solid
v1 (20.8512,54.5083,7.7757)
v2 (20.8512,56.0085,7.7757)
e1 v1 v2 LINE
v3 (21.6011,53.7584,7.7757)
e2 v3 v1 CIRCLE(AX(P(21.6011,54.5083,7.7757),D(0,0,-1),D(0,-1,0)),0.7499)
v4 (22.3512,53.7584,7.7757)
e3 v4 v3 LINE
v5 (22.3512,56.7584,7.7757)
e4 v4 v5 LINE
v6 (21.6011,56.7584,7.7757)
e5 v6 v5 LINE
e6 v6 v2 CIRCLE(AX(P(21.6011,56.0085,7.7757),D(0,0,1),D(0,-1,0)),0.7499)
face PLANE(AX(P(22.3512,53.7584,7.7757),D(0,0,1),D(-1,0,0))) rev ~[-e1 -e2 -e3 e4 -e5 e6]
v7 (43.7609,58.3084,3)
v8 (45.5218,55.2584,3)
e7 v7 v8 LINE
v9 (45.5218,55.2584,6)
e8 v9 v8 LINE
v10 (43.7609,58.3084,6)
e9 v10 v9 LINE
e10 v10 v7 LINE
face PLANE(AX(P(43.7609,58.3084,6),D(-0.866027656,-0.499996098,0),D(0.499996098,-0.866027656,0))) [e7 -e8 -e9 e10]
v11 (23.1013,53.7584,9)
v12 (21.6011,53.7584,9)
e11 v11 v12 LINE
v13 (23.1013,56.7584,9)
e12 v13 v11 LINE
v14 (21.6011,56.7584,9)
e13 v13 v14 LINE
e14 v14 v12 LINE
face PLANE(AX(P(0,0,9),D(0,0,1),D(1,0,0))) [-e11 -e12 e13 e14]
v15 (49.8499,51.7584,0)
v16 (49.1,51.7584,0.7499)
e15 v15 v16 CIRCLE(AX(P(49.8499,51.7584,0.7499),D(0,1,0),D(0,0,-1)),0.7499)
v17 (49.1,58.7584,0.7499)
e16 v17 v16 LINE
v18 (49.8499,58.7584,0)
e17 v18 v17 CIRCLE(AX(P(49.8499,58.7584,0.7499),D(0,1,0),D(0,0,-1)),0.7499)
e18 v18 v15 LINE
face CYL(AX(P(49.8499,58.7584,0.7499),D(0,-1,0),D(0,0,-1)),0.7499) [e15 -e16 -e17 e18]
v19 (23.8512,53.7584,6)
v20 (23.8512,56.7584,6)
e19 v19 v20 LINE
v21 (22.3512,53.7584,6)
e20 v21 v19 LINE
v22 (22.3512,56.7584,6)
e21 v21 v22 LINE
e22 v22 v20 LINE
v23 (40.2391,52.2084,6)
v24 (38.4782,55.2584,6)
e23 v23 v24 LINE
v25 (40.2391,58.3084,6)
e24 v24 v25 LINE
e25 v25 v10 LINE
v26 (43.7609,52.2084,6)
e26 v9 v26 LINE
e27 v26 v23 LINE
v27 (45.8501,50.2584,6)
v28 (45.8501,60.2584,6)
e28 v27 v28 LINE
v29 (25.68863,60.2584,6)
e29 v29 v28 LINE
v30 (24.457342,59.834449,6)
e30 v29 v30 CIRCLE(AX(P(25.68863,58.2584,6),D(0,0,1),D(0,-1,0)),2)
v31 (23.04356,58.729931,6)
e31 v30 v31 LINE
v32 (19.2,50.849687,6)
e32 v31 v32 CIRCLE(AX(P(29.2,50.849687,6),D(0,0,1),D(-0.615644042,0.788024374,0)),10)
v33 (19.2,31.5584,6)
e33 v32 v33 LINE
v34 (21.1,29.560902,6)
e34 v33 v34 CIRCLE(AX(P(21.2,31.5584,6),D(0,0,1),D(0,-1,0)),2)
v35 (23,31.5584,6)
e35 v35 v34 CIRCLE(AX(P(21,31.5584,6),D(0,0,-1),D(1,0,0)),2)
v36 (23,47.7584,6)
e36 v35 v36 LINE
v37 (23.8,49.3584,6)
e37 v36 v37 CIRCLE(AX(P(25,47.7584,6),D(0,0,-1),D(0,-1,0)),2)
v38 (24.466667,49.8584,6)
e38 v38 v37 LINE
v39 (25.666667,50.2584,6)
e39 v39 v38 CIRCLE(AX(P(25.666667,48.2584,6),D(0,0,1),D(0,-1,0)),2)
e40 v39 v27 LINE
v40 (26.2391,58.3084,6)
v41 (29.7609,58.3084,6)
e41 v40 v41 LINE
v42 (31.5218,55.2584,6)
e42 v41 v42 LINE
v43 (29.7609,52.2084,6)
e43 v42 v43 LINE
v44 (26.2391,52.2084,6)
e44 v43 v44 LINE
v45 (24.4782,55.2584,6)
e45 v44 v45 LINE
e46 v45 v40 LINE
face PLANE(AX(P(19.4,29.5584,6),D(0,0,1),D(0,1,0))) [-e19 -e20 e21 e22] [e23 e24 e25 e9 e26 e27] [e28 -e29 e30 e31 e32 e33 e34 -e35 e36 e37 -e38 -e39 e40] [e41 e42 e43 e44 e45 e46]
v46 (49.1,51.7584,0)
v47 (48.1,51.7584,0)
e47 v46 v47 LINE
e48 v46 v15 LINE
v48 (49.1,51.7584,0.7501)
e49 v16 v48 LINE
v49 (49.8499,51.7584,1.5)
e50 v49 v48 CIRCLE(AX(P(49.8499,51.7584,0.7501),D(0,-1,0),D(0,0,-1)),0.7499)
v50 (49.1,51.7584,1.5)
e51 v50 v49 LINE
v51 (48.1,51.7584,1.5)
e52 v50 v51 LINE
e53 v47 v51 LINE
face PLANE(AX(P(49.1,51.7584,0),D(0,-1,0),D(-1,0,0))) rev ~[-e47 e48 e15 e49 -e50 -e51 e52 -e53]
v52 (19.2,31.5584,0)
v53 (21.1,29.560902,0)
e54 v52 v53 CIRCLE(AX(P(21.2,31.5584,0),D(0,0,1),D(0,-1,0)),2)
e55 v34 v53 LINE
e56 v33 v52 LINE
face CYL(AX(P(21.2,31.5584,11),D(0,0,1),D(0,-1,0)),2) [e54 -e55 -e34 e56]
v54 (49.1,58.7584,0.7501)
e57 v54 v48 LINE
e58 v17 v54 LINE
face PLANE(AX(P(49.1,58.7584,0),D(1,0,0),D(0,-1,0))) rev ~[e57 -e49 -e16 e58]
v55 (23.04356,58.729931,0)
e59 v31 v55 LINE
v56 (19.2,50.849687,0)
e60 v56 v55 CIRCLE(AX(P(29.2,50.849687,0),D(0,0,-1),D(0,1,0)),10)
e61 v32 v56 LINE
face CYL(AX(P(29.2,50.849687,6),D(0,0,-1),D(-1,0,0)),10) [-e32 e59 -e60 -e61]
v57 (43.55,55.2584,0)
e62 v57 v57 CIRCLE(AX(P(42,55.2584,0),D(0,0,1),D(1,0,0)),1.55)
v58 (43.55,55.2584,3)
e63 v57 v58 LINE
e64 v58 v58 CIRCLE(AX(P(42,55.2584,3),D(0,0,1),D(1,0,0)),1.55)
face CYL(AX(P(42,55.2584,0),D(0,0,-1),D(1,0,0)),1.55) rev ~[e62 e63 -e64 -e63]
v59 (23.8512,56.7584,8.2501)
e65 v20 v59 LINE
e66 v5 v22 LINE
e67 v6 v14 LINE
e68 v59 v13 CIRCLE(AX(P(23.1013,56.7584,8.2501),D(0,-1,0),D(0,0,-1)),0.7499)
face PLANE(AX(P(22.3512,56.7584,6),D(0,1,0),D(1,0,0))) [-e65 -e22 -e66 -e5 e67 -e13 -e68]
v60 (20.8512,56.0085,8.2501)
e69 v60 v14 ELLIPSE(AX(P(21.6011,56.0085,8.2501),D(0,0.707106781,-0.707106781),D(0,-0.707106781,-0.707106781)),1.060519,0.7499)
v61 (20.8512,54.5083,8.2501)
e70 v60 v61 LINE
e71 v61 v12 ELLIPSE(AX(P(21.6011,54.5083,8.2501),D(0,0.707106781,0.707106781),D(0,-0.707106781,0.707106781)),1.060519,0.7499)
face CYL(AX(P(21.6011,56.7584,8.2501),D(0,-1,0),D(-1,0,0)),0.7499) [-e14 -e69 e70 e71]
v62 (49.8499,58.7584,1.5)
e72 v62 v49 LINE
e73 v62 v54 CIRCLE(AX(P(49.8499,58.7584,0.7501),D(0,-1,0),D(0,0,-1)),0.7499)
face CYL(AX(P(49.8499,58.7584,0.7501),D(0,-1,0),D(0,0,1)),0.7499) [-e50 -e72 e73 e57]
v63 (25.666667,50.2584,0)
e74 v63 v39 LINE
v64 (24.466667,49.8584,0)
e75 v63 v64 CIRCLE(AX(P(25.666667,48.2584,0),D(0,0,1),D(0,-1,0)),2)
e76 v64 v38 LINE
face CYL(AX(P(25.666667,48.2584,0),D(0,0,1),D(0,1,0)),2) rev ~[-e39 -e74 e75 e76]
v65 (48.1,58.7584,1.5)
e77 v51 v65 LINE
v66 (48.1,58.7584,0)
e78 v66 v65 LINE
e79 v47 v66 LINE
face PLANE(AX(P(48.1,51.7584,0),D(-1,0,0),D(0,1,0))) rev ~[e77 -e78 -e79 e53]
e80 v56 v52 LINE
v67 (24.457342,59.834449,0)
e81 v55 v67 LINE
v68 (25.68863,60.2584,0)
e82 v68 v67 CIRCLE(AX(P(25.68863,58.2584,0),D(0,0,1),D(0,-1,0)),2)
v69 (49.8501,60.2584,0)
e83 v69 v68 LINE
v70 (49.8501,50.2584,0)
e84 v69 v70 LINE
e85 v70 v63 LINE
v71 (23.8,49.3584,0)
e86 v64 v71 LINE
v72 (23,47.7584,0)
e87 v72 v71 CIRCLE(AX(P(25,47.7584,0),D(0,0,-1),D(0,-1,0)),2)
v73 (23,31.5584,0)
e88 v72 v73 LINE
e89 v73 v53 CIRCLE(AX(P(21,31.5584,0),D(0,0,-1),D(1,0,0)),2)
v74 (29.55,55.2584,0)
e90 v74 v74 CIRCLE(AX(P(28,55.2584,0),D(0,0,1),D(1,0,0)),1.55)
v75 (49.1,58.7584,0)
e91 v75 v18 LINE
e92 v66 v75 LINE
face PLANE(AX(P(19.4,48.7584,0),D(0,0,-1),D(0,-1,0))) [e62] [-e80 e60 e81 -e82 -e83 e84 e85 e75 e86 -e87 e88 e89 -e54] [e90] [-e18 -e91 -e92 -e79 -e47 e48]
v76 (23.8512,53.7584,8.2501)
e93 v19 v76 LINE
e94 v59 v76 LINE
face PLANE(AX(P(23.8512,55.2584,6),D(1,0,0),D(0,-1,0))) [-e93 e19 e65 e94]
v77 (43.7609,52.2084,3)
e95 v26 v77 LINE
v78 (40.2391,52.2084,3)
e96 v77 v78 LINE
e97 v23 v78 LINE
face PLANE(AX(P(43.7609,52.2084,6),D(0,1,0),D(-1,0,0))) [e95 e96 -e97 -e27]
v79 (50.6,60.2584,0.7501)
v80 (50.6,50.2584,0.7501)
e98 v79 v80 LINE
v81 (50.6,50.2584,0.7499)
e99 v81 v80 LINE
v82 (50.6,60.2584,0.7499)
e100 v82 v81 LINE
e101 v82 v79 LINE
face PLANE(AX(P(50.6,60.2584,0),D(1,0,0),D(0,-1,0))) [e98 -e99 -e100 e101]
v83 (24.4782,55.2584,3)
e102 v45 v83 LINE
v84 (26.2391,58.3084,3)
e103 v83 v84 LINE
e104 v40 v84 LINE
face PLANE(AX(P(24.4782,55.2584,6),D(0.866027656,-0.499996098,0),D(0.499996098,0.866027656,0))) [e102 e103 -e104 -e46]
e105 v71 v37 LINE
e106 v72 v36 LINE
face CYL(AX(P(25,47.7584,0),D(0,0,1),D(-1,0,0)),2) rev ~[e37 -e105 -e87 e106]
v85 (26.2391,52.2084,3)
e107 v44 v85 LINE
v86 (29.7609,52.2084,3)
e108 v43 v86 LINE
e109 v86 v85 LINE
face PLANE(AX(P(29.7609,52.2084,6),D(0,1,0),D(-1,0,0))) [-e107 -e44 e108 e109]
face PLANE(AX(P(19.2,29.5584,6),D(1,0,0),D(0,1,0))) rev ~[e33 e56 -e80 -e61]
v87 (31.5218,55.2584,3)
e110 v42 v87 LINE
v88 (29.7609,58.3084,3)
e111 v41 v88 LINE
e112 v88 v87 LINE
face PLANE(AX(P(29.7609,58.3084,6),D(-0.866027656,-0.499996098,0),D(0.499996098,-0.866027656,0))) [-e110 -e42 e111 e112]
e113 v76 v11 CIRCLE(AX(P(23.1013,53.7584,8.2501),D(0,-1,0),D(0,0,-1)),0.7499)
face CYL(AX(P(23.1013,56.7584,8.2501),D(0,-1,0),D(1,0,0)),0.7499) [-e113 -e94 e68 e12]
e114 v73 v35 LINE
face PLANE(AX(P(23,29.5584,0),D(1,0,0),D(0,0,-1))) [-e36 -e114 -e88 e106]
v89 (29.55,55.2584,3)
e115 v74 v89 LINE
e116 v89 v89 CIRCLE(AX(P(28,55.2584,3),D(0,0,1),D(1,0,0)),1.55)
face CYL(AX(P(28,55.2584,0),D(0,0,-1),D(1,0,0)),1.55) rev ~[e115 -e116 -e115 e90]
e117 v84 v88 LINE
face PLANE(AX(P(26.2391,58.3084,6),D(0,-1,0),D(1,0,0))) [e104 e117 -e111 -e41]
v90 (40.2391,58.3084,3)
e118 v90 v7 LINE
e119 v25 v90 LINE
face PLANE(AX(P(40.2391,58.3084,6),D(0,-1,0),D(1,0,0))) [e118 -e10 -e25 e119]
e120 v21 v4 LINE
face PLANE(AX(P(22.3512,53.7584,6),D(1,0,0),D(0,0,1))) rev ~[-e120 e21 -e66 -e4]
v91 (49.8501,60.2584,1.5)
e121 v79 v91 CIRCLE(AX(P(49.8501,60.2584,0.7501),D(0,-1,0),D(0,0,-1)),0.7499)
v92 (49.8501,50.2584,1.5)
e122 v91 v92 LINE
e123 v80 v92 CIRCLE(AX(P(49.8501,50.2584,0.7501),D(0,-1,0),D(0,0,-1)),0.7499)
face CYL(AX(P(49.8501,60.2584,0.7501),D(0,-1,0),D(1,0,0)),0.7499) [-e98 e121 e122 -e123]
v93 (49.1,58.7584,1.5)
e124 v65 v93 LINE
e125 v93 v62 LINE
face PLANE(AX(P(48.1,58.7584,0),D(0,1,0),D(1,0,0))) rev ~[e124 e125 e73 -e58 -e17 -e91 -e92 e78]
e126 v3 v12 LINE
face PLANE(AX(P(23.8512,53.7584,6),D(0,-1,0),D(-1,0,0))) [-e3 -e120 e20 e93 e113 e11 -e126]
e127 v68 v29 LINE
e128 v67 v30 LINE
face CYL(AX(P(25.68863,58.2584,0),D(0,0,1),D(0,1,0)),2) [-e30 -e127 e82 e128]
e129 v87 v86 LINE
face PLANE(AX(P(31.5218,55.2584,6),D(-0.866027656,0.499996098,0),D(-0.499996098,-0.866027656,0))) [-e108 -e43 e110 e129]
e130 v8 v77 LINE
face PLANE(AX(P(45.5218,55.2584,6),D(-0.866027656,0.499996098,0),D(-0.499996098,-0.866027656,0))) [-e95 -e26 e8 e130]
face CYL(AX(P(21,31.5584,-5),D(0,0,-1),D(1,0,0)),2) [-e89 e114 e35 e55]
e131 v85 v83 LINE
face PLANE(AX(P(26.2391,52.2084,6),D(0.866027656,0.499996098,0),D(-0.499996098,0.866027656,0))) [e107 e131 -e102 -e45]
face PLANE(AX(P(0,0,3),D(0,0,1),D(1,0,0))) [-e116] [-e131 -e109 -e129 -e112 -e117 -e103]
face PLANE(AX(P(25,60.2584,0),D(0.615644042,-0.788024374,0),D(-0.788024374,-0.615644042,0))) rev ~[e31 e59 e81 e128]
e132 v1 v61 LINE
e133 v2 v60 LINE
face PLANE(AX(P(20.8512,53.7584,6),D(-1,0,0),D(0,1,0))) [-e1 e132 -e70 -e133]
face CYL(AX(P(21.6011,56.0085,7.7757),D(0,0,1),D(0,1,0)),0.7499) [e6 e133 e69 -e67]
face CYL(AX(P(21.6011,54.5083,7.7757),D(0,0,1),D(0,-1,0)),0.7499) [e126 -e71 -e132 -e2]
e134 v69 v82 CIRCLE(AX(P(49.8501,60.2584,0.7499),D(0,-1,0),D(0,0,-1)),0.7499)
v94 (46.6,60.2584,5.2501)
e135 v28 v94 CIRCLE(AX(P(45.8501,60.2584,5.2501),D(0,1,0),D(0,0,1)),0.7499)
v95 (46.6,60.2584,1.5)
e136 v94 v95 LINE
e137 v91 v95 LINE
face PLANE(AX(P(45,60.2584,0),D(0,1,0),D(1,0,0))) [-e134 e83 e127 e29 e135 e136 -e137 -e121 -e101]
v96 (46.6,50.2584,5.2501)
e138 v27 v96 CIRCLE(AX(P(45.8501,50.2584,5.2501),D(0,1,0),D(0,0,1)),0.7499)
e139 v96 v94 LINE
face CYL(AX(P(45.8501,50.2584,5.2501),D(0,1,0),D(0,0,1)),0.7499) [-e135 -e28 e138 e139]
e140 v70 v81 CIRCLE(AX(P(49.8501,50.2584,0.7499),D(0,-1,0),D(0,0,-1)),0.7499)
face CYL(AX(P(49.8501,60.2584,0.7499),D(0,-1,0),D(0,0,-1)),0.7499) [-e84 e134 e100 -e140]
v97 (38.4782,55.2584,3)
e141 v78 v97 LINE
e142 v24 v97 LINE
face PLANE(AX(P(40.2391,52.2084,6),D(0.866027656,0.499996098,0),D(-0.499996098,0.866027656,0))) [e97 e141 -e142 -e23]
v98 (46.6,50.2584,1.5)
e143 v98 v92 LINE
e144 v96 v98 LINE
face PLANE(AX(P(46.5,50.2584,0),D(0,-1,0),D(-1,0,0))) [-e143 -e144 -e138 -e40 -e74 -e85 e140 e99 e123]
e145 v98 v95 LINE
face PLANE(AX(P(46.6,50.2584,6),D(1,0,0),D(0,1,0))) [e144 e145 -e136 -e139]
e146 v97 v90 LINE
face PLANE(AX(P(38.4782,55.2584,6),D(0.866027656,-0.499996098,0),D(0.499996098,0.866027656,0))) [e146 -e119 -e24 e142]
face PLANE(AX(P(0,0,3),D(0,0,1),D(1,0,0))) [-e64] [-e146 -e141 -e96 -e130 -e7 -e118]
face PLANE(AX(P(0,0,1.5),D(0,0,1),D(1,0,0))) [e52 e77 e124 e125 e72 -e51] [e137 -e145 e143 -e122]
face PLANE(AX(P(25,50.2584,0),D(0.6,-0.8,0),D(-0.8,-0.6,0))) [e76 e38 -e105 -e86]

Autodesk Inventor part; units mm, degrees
ref_plane "YZ Plane" through (0, 0, 0) normal (1, 0, 0) x (0, 1, 0)
ref_plane "XZ Plane" through (0, 0, 0) normal (0, 1, 0) x (-1, 0, 0)
ref_plane "Work Plane1" through (0, 0, 0) normal (0, 0, 1) x (1, 0, 0)
sketch "mount_sketch" plane through (0, 0, 0) normal (0, 0, 1) x (1, 0, 0)
  circle A0 centre (42, 55.2584) radius 1.55 projected
  circle A1 centre (28, 55.2584) radius 1.55 projected
  line L0 (45, 60.2584) -> (25, 60.2584)
  line L1 (25, 60.2584) -> (15.4, 52.7584)
  line L2 (15.4, 52.7584) -> (15.4, 29.5584)
  line L3 (15.4, 29.5584) -> (19.4, 29.5584)
  line L4 (19.4, 29.5584) -> (19.4, 48.7584)
  line L5 (19.4, 48.7584) -> (23, 48.7584)
  circle A2 centre (42, -54.7416) radius 1.55 construction
  circle A3 centre (28, -54.7416) radius 1.55 construction
  line L6 (47, -54.627) -> (47, 66.2497) construction
  circle A4 centre (12, 51.2584) radius 1.55 construction
  circle A5 centre (12, -37.8416) radius 1.55 construction
  circle A6 centre (12, -54.7416) radius 1.55 construction
  circle A7 centre (29, -68.7416) radius 1.55 construction
  circle A8 centre (14, -68.7416) radius 1.55 construction
  line L7 (45, 50.2584) -> (25, 50.2584)
  line L8 (25, 50.2584) -> (23, 48.7584)
  line L9 (45, 60.2584) -> (46.5, 60.2584)
  line L10 (46.5, 60.2584) -> (46.5, 50.2584)
  line L11 (46.5, 50.2584) -> (45, 50.2584)
  line L12 (23, 48.7584) -> (23, 58.6959)
  line L13 (35, 55.2584) -> (35, 60.2584)
  line L14 (35, 55.2584) -> (35, 50.2584)
  line L15 (46.5, 60.2584) -> (46.6, 60.2584)
  line L16 (46.6, 60.2584) -> (46.6, 50.2584)
  line L17 (46.6, 50.2584) -> (46.5, 50.2584)
  line L18 (46.6, 60.2584) -> (50.6, 60.2584)
  line L19 (50.6, 60.2584) -> (50.6, 50.2584)
  line L20 (50.6, 50.2584) -> (46.6, 50.2584)
  line L21 (46.6, 50.2584) -> (46.6, 60.2584)
  line L22 (48.1, 58.7584) -> (49.1, 58.7584)
  line L23 (49.1, 58.7584) -> (49.1, 51.7584)
  line L24 (49.1, 51.7584) -> (48.1, 51.7584)
  line L25 (48.1, 51.7584) -> (48.1, 58.7584)
  point P0 (0, 0)
  dimension "d1" = 110
  dimension "d2" = 6.5
  dimension "d3" = 27.6
  dimension "d4" = 4
  dimension "d5" = 14
  dimension "d6" = 5
  dimension "d7" = 19.2
  dimension "d9" = 3.4
  dimension "d13" = 3
  dimension "d30" = 2
  dimension "d32" = 5
  dimension "d62" = 4.5
  dimension "d77" = 4.6
  dimension "d128" = 4
  dimension "d129" = 1.5
  dimension "d130" = 1.5
  dimension "d132" = 7
  dimension "d133" = 1.5
extrude "mount" add sketch "mount_sketch" along normal blind 6
fillet "common" radius 2 2 edges at (25, 60.2584, 3) (25, 50.2584, 3)
sketch "nuts_sketch" plane through (0, 0, 6) normal (0, 0, 1) x (1, 0, 0)
  circle A0 centre (42, 55.2584) radius 1.55 projected
  circle A1 centre (28, 55.2584) radius 1.55 projected
  line L0 (38.4782, 55.2584) -> (40.2391, 58.3084)
  line L1 (40.2391, 58.3084) -> (43.7609, 58.3084)
  line L2 (43.7609, 58.3084) -> (45.5218, 55.2584)
  line L3 (45.5218, 55.2584) -> (43.7609, 52.2084)
  line L4 (43.7609, 52.2084) -> (40.2391, 52.2084)
  line L5 (40.2391, 52.2084) -> (38.4782, 55.2584)
  line L6 (31.5218, 55.2584) -> (29.7609, 52.2084)
  line L7 (29.7609, 52.2084) -> (26.2391, 52.2084)
  line L8 (26.2391, 52.2084) -> (24.4782, 55.2584)
  line L9 (24.4782, 55.2584) -> (26.2391, 58.3084)
  line L10 (26.2391, 58.3084) -> (29.7609, 58.3084)
  line L11 (29.7609, 58.3084) -> (31.5218, 55.2584)
  point P0 (0, 0)
  dimension "d26" = 6.1
  dimension "d27" = 6.1
extrude "nuts" cut sketch "nuts_sketch" against normal blind 3
sketch "Sketch20" plane through (19.4, 29.5584, 0) normal (1, 0, 0) x (0, 0, -1)
  line L0 (-6, 0) -> (-6, 19.2) projected
  line L1 (-6, 0) -> (-6, 19.2)
  line L2 (0, 19.2) -> (-6, 19.2) projected
  line L3 (-6, 19.2) -> (0, 19.2)
  line L4 (0, 0) -> (-6, 0) projected
  line L5 (0, 19.2) -> (0, 0)
  line L6 (0, 0) -> (-6, 0)
  point P0 (0, -29.5584)
extrude "Extrusion15" add sketch "Sketch20" along normal blind 3.6
sketch "Sketch21" plane through (0, 0, 6) normal (0, 0, 1) x (1, 0, 0)
  line L0 (15.4, 29.5584) -> (23, 29.5584) projected
  line L1 (19.2, 29.5584) -> (19.2, 55.7272)
  line L2 (24.4573, 59.8345) -> (15.4, 52.7584) projected
  line L3 (15.4, 52.7584) -> (15.4, 29.5584) projected
  line L4 (19.2, 29.5584) -> (15.4, 29.5584)
  line L5 (15.4, 29.5584) -> (15.4, 52.7584)
  line L6 (15.4, 52.7584) -> (19.2, 55.7272)
  line L7 (23, 48.7584) -> (24.4667, 49.8584) projected
  line L8 (23, 48.7584) -> (19.2, 48.7584)
  line L9 (23, 48.7584) -> (23, 29.5584) projected
  line L10 (23, 48.7584) -> (23, 58.6959)
  line L11 (19.2, 48.7584) -> (23, 58.6959)
  point P0 (0, 0)
extrude "Extrusion16" cut sketch "Sketch21" against normal blind 6 contours L3 L2 L1 L0
sketch "Sketch22" plane through (0, 0, 6) normal (0, 0, 1) x (1, 0, 0)
  line L0 (23, 48.7584) -> (23, 29.5584) projected
  line L1 (23, 48.7584) -> (23, 58.6959)
  line L2 (24.4573, 59.8345) -> (19.2, 55.7272) projected
  line L3 (23, 48.7584) -> (19.2, 48.7584)
  line L4 (19.2, 29.5584) -> (19.2, 55.7272) projected
  point P0 (0, 0)
fillet "Fillet12" radius 10 1 edges at (19.2, 55.7272, 3)
fillet "Fillet13" radius 2 1 edges at (23, 48.7584, 3)
fillet "Fillet14" radius 2 2 edges at (23, 29.5584, 3) (19.2, 29.5584, 3)
sketch "Sketch28" plane through (0, 0, 6) normal (0, 0, 1) x (1, 0, 0)
  line L0 (24.4782, 55.2584) -> (26.2391, 58.3084) projected
  line L1 (26.2391, 58.3084) -> (29.7609, 58.3084) projected
  line L2 (29.7609, 58.3084) -> (31.5218, 55.2584) projected
  line L3 (31.5218, 55.2584) -> (29.7609, 52.2084) projected
  line L4 (29.7609, 52.2084) -> (26.2391, 52.2084) projected
  line L5 (26.2391, 52.2084) -> (24.4782, 55.2584) projected
  arc A0 (25.6886, 60.2584) -> (24.4573, 59.8345) centre (25.6886, 58.2584) ccw projected
  line L6 (24.4573, 59.8345) -> (23.0436, 58.73) projected
  arc A1 (23.0436, 58.73) -> (19.2, 50.8497) centre (29.2, 50.8497) ccw projected
  line L7 (19.2, 50.8497) -> (19.2, 31.5484) projected
  arc A2 (19.2, 31.5484) -> (21, 29.5584) centre (21.2, 31.5484) ccw projected
  arc A3 (21, 29.5584) -> (23, 31.5584) centre (21, 31.5584) ccw projected
  line L8 (23, 47.7584) -> (23, 31.5584) projected
  arc A4 (23.8, 49.3584) -> (23, 47.7584) centre (25, 47.7584) ccw projected
  line L9 (23.8, 49.3584) -> (24.4667, 49.8584) projected
  arc A5 (25.6667, 50.2584) -> (24.4667, 49.8584) centre (25.6667, 48.2584) ccw projected
  line L10 (45.5218, 55.2584) -> (43.7609, 52.2084) projected
  line L11 (43.7609, 52.2084) -> (40.2391, 52.2084) projected
  line L12 (40.2391, 52.2084) -> (38.4782, 55.2584) projected
  line L13 (38.4782, 55.2584) -> (40.2391, 58.3084) projected
  line L14 (40.2391, 58.3084) -> (43.7609, 58.3084) projected
  line L15 (43.7609, 58.3084) -> (45.5218, 55.2584) projected
  line L16 (29.7609, 52.2084) -> (26.2391, 52.2084) projected
  line L17 (26.2391, 52.2084) -> (19.2927, 52.2084)
  line L18 (24.4782, 55.2584) -> (22.3512, 55.2584)
  line L19 (22.3512, 55.2584) -> (22.3512, 52.823)
  line L20 (22.3512, 55.2584) -> (20.2243, 55.2584)
  line L21 (22.3512, 55.2584) -> (22.3512, 57.0751)
  line L22 (20.8512, 56.7584) -> (22.3512, 56.7584)
  line L23 (23.8512, 56.7584) -> (23.8512, 53.7584)
  line L24 (23.8512, 53.7584) -> (20.8512, 53.7584)
  line L25 (20.8512, 53.7584) -> (20.8512, 55.2584)
  line L26 (20.8512, 55.2584) -> (20.8512, 56.7584)
  line L27 (22.3512, 56.7584) -> (23.8512, 56.7584)
  line L28 (25.6667, 50.2584) -> (50.6, 50.2584) projected
  line L29 (50.6, 50.2584) -> (50.6, 60.2584) projected
  line L30 (50.6, 60.2584) -> (25.6886, 60.2584) projected
  point P0 (0, 0)
  dimension "d121" = 3
  dimension "d122" = 3
extrude "hook" add sketch "Sketch28" along normal blind 3 contours L23 L24 L19 L18 | L18 L21 L27 L23 | L19 L24 L25 L20 | L20 L26 A1 L22 L21 | L26 L22 A1
sketch "Sketch29" plane through (20.8512, 53.7584, 6) normal (0, -1, 0) x (1, 0, 0)
  line L0 (3, 0) -> (0, 0) projected
  line L1 (3, 0) -> (3, 3) projected
  line L2 (0, 3) -> (3, 3) projected
  line L3 (0, 0) -> (0, 3) projected
  line L4 (0, 0) -> (1.5, 0)
  line L5 (1.5, 0) -> (1.5, 1.7757)
  line L6 (1.5, 1.7757) -> (0, 1.7757)
  line L7 (0, 1.7757) -> (0, 0)
  line L8 (1.5, 1.7757) -> (3, 1.7757)
  line L9 (0, 0) -> (0, 3) projected
  line L10 (0, 1.7757) -> (0, 3)
  point P0 (-20.8512, -6)
extrude "hook_cutout" cut sketch "Sketch29" against normal through all contours L0 L3 L6 L5
sketch "Sketch33" plane through (0, 0, 6) normal (0, 0, 1) x (1, 0, 0)
  line L0 (49.1, 58.7584) -> (49.1, 51.7584) projected
  line L1 (49.1, 51.7584) -> (48.1, 51.7584) projected
  line L2 (48.1, 51.7584) -> (48.1, 58.7584) projected
  line L3 (48.1, 58.7584) -> (49.1, 58.7584) projected
  line L4 (25.6667, 50.2584) -> (50.6, 50.2584) projected
  line L5 (50.6, 60.2584) -> (25.6886, 60.2584) projected
  line L6 (50.6, 50.2584) -> (46.6, 50.2584)
  line L7 (46.6, 50.2584) -> (46.6, 60.2584)
  line L8 (46.6, 60.2584) -> (50.6, 60.2584)
  line L9 (50.6, 60.2584) -> (50.6, 50.2584)
  point P0 (0, 0)
  dimension "d141" = 4
extrude "Extrusion25" cut sketch "Sketch33" against normal blind 4.5
fillet "Fillet21" radius 0.75 9 edges at (49.1, 55.2584, 1.5) (50.6, 55.2584, 1.5) (49.1, 55.2584, 0) (50.6, 55.2584, 0) (46.6, 55.2584, 6) (20.8512, 55.2584, 9) (23.8512, 55.2584, 9) (20.8512, 56.7584, 8.3879) (20.8512, 53.7584, 8.3879)
equation "\"d27\" = d26"
equation "\"hook_width\" = 1.5"
equation "\"hook_height\" = 7"
properties part number "mount_battery" material "ABS Plastic"
